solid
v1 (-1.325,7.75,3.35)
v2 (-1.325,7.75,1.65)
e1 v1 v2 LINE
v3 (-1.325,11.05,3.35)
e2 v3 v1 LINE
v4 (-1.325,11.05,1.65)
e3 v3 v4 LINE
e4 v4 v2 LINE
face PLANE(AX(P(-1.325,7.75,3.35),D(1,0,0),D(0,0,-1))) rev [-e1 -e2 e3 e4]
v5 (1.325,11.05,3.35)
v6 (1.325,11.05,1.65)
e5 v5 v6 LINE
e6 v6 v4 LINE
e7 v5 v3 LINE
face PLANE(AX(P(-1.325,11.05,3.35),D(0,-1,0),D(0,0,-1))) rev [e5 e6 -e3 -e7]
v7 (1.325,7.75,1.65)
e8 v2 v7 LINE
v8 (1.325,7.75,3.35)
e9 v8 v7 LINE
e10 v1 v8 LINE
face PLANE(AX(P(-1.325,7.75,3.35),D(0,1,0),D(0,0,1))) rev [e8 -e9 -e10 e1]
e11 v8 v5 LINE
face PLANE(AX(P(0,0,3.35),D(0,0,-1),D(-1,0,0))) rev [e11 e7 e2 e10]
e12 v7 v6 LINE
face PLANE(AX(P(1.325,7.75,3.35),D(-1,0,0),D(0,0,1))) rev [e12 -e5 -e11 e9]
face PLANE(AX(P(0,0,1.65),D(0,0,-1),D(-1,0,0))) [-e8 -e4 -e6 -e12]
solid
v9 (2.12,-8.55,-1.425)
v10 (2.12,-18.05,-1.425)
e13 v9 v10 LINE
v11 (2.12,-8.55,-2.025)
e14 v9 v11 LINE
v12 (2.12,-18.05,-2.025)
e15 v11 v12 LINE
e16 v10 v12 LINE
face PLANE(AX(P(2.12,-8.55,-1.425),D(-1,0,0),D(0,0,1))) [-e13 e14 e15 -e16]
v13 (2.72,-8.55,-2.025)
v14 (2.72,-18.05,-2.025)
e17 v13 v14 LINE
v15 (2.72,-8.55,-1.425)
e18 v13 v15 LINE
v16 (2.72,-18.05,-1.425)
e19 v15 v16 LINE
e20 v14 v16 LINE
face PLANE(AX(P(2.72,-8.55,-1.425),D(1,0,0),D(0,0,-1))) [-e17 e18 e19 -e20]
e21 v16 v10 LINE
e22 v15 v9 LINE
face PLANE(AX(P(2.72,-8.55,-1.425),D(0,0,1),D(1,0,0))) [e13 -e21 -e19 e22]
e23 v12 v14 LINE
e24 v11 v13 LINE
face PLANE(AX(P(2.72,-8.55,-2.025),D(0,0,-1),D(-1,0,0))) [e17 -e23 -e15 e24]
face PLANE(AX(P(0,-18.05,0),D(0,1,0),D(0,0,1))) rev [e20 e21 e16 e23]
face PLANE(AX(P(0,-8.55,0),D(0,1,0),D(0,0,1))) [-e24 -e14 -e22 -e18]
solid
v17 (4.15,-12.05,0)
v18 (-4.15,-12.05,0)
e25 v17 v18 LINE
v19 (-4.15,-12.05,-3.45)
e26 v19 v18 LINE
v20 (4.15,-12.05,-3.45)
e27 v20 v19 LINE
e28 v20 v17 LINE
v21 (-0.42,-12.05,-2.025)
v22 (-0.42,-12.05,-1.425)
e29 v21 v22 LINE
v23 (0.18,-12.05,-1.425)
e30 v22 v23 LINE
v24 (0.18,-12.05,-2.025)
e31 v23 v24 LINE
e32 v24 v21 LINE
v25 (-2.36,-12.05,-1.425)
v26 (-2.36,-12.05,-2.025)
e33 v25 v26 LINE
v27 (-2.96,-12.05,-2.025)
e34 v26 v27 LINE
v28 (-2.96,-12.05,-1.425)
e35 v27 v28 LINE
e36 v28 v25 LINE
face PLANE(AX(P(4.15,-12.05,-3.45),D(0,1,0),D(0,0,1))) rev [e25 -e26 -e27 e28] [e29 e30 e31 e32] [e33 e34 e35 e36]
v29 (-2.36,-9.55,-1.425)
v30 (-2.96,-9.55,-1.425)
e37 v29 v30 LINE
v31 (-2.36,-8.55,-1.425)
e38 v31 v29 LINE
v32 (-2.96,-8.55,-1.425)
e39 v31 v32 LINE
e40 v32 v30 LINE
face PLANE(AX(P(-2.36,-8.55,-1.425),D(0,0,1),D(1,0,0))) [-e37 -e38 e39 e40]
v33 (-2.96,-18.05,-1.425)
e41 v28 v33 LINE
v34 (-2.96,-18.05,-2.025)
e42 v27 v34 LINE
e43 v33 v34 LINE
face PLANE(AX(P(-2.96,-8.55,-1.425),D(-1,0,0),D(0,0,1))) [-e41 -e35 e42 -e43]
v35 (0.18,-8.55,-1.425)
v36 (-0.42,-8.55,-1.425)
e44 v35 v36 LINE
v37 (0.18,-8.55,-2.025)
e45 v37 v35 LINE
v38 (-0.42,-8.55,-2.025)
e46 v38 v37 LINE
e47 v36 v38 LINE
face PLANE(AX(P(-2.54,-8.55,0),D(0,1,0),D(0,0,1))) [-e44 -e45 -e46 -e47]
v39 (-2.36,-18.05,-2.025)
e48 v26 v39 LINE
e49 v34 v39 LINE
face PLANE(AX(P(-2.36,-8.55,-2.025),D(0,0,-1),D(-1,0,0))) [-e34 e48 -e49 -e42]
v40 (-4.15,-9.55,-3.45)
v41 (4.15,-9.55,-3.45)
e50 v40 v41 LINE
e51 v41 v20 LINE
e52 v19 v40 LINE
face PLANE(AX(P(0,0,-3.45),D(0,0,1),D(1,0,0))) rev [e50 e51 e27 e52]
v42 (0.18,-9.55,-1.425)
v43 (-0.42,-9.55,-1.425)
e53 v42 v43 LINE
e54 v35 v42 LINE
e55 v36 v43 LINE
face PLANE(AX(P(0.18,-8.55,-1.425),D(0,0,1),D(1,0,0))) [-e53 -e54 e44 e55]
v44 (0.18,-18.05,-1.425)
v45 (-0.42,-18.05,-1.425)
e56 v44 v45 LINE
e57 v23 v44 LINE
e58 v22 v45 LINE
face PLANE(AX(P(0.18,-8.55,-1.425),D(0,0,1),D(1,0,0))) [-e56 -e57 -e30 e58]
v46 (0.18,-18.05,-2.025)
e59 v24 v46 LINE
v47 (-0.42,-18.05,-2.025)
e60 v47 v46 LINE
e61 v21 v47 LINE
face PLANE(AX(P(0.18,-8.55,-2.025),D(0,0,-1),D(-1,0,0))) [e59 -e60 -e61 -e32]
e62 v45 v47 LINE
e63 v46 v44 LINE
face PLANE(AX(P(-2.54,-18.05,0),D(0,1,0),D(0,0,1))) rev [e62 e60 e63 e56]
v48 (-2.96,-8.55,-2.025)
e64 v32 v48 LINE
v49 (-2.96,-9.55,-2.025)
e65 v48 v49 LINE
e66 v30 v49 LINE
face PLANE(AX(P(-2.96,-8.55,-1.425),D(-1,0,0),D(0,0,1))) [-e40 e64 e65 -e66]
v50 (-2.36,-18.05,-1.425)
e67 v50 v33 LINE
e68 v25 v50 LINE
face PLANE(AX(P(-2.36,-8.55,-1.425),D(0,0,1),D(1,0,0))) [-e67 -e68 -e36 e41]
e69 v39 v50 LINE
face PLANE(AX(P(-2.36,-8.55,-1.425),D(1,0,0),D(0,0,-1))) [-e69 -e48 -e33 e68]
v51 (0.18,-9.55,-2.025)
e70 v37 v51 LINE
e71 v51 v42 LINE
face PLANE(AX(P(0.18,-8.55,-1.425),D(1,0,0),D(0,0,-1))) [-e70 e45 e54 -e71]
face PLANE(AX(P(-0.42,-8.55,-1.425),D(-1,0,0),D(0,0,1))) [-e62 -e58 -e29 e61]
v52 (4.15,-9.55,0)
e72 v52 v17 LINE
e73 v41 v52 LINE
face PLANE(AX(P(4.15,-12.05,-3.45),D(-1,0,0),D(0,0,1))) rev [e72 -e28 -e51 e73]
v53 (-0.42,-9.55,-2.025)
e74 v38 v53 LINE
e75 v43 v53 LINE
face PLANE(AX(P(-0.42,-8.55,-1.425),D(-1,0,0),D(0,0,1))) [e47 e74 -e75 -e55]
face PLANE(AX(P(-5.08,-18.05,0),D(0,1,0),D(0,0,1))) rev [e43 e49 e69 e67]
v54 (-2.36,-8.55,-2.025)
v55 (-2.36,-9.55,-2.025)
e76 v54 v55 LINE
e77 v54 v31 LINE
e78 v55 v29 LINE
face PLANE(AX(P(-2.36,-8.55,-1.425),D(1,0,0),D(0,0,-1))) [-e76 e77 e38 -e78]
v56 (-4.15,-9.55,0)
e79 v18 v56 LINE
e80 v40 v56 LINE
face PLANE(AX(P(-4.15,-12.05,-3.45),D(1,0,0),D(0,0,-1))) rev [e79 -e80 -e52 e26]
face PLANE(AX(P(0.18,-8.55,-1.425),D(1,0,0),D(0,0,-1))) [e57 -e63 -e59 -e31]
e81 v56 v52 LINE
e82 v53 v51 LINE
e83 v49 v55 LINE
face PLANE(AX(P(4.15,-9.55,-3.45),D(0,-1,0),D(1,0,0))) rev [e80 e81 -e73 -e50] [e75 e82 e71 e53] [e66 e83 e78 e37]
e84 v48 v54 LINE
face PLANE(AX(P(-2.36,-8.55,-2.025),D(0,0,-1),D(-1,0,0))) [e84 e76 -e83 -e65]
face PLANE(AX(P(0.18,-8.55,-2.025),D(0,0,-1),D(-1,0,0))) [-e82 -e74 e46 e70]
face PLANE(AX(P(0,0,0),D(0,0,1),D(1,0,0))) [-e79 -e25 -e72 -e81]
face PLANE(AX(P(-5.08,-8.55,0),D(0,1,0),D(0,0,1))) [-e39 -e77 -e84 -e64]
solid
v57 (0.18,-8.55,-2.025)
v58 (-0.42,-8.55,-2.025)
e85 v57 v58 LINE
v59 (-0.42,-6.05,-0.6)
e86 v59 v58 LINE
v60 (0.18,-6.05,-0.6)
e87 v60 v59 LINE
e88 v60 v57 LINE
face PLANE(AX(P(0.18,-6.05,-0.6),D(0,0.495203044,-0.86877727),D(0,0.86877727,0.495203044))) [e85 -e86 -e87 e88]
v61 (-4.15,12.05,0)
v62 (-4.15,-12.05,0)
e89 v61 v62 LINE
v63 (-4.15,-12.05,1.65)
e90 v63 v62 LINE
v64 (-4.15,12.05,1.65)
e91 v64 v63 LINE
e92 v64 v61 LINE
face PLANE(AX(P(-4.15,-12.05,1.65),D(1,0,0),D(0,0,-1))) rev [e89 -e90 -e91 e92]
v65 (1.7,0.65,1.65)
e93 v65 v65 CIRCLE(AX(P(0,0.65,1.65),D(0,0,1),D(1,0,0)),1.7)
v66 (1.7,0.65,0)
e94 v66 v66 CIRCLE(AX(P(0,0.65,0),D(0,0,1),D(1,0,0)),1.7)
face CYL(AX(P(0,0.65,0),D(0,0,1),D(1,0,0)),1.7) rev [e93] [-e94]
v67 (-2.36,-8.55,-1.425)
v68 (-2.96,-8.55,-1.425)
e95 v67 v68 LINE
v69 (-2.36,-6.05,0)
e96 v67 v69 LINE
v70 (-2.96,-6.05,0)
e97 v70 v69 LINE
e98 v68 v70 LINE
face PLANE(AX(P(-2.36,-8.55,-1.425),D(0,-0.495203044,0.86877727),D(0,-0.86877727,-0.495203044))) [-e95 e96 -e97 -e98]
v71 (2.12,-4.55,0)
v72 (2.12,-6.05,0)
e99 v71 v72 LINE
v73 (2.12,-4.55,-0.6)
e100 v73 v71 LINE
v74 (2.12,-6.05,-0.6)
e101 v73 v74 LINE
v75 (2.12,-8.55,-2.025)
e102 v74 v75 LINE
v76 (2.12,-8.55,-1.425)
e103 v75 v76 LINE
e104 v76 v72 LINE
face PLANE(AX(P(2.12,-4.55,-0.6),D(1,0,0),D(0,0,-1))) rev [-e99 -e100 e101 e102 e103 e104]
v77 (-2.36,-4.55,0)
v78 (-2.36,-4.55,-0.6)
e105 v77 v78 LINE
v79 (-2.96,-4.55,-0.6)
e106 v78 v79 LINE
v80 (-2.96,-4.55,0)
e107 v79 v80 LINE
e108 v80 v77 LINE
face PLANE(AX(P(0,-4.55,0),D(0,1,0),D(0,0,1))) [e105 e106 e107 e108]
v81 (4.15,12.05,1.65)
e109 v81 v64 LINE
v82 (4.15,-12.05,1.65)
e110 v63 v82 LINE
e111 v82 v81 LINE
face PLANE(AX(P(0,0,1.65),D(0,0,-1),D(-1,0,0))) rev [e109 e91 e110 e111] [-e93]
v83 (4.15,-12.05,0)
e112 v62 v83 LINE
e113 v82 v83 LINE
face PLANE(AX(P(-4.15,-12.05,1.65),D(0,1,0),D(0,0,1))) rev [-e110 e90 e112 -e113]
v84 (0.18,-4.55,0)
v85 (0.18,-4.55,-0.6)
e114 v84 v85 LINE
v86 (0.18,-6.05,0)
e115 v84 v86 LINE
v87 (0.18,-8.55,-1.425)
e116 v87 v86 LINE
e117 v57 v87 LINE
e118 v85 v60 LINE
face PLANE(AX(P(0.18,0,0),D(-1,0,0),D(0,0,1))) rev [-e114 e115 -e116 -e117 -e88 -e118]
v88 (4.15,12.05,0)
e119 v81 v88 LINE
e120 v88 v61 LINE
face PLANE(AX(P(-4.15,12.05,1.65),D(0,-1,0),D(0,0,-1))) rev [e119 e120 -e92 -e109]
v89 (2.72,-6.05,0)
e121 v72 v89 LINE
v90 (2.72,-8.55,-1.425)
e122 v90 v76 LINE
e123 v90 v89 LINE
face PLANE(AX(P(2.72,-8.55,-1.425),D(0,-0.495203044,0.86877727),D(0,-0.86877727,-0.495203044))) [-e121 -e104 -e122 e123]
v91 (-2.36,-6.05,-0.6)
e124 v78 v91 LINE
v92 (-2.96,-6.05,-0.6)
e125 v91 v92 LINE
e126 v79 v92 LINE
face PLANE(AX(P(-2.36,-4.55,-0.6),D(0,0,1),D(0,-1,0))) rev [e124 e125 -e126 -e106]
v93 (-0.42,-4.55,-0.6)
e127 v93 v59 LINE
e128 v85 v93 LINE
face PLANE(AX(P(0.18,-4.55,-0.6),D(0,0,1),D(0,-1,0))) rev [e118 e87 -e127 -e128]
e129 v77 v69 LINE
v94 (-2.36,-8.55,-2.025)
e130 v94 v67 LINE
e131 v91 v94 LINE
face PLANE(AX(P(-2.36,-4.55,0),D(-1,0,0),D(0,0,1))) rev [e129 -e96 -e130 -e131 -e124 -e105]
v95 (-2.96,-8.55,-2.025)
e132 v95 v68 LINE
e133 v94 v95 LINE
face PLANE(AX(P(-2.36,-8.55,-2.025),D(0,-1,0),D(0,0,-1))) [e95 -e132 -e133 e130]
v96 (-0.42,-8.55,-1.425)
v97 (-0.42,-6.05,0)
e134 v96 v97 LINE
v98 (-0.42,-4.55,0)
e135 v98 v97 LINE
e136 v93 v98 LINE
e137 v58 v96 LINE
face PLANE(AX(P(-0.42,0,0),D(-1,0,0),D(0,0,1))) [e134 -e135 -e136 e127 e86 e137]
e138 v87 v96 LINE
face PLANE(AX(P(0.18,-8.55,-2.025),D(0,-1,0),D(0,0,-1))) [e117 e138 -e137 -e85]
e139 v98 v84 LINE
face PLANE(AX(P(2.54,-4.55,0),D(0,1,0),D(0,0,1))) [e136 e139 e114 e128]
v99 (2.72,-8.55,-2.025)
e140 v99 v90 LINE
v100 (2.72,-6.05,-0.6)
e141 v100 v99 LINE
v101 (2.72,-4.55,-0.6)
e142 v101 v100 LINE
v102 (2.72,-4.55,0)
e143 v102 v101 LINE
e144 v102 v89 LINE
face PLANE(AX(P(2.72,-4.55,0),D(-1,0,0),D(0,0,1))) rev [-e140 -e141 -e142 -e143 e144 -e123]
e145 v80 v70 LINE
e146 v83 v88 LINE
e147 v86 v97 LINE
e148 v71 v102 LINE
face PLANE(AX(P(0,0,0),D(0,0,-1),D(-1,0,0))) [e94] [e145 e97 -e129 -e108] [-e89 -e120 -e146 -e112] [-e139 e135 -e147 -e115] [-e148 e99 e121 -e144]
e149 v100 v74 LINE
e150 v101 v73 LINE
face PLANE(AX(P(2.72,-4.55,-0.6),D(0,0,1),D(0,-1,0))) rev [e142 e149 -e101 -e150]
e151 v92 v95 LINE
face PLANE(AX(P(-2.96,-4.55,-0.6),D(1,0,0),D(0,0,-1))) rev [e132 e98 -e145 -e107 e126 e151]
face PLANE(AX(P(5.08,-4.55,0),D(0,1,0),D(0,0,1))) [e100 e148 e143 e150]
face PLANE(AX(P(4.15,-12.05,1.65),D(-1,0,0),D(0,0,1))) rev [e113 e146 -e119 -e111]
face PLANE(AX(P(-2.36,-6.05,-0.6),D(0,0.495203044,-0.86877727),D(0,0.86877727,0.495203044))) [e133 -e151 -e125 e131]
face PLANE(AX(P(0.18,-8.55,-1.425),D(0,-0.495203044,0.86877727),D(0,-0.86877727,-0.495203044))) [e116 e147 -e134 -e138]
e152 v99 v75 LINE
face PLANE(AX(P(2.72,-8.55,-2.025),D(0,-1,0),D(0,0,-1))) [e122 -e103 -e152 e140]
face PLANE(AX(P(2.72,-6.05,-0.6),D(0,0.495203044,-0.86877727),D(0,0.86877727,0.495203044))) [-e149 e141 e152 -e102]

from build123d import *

# Parameters (mm, degrees)
SKETCH_1_W                   = 8.3
SKETCH_1_H                   = 24.1
EXTRUDE_1_DEPTH              = 1.65
SKETCH_2_W                   = 2.65
SKETCH_2_H                   = 3.3
EXTRUDE_2_DEPTH              = 1.7
SKETCH_3_R                   = 1.7
CUT_EXTRUDE_1_DEPTH          = 13.857488091
SKETCH_4_W                   = 8.3
SKETCH_4_H                   = 2.5
EXTRUDE_3_DEPTH              = 3.45
EXTRUDE_START                = -3.5
SKETCH_5_W                   = 0.6
SKETCH_5_H                   = 0.6
EXTRUDE_4_DEPTH              = 9.5
PATTERN_START                = -2.025
PATTERN_LINEAR_1_OUTLINE_W   = 0.6
PATTERN_LINEAR_1_OUTLINE_H   = 1
PATTERN_LINEAR_1_OUTLINE_H_2 = 6
PATTERN_LINEAR_1_DEPTH       = 0.6
EXTRUDE_5_DEPTH              = 0.6
PATTERN_LINEAR_2_COUNT       = 3
PATTERN_LINEAR_2_PITCH       = 2.54
SKETCH_7_W                   = 0.6
SKETCH_7_H                   = 0.6
EXTRUDE_6_DEPTH              = 1.5
PATTERN_LINEAR_3_COUNT       = 3
PATTERN_LINEAR_3_PITCH       = 2.54


# Read off the part's stored shape, not the designer's step: 直線複製排列1
with BuildPart() as part:
    # 草圖1 → 填料-伸長1 (new body)
    with BuildSketch(Plane.XY):
        Rectangle(SKETCH_1_W, SKETCH_1_H)
    extrude(amount=EXTRUDE_1_DEPTH)

    # 草圖3 → 除料-伸長1 (cut, through all)
    with BuildSketch(Plane.XY.offset(1.65)):
        with Locations((0, 0.65)):
            Circle(SKETCH_3_R)
    extrude(amount=-CUT_EXTRUDE_1_DEPTH, mode=Mode.SUBTRACT)



with BuildPart() as body_2:
    # 草圖2 → 填料-伸長2 (new body)
    with BuildSketch(Plane.XY.offset(1.65)):
        with Locations((0, 9.4)):
            Rectangle(SKETCH_2_W, SKETCH_2_H)
    extrude(amount=EXTRUDE_2_DEPTH)


with BuildPart() as body_3:
    # 草圖4 → 填料-伸長3 (new body)
    with BuildSketch(Plane(origin=(0, 0, 0), x_dir=(-1, 0, 0), z_dir=(0, 0, -1))):
        with Locations((0, -10.8)):
            Rectangle(SKETCH_4_W, SKETCH_4_H)
    extrude(amount=EXTRUDE_3_DEPTH)

    # 直線複製排列1 outline → 直線複製排列1 (add)
    with BuildSketch(Plane.XY.offset(PATTERN_START)):
        with Locations((-0.12, -9.05)):
            Rectangle(PATTERN_LINEAR_1_OUTLINE_W, PATTERN_LINEAR_1_OUTLINE_H)
        with Locations((-2.66, -9.05)):
            Rectangle(PATTERN_LINEAR_1_OUTLINE_W, PATTERN_LINEAR_1_OUTLINE_H)
        with Locations((-2.66, -15.05)):
            Rectangle(PATTERN_LINEAR_1_OUTLINE_W, PATTERN_LINEAR_1_OUTLINE_H_2)
        with Locations((-0.12, -15.05)):
            Rectangle(PATTERN_LINEAR_1_OUTLINE_W, PATTERN_LINEAR_1_OUTLINE_H_2)
    extrude(amount=PATTERN_LINEAR_1_DEPTH)


with BuildPart() as body_4:
    # 草圖5 → 填料-伸長4 (new body)
    with BuildSketch(Plane.XZ.offset(12.05).offset(EXTRUDE_START)):
        with Locations((2.42, -1.725)):
            Rectangle(SKETCH_5_W, SKETCH_5_H)
    extrude(amount=EXTRUDE_4_DEPTH)


with BuildPart() as body_5:
    # 草圖6 → 填料-伸長5 (new body)
    with BuildSketch(Plane.ZY.offset(2.96)):
        Polygon((-1.425, -8.55), (0, -6.05), (-0.6, -6.05), (-2.025, -8.55), align=None)
    extrude_5 = extrude(amount=-EXTRUDE_5_DEPTH)


with BuildPart() as pattern_linear_2_1:
    # 直線複製排列2: pattern copy
    add(extrude_5.moved(Location(Vector(1, 0, 0) * (1 * PATTERN_LINEAR_2_PITCH))))


with BuildPart() as pattern_linear_2_2:
    # 直線複製排列2: pattern copy
    add(extrude_5.moved(Location(Vector(1, 0, 0) * (2 * PATTERN_LINEAR_2_PITCH))))


with BuildPart() as part_1:
    add(part.part)

    add(body_5.part)  # 填料-伸長6 merges body 5
    # 草圖7 → 填料-伸長6 (add)
    with BuildSketch(Plane(origin=(0, -6.05, 0), x_dir=(1, 0, 0), z_dir=(0, 1, 0))):
        with Locations((-2.66, 0.3)):
            Rectangle(SKETCH_7_W, SKETCH_7_H)
    extrude_6 = extrude(amount=EXTRUDE_6_DEPTH)


    add(pattern_linear_2_1.part)  # 直線複製排列3 merges 直線複製排列2_1

    add(pattern_linear_2_2.part)  # 直線複製排列3 merges 直線複製排列2_2
    # 直線複製排列3: 填料-伸長6 ×3
    with Locations(*[(i * PATTERN_LINEAR_3_PITCH, 0, 0) for i in range(1, PATTERN_LINEAR_3_COUNT)]):
        add(extrude_6)


solid = Compound([body_2.part, body_3.part, body_4.part, part_1.part])
